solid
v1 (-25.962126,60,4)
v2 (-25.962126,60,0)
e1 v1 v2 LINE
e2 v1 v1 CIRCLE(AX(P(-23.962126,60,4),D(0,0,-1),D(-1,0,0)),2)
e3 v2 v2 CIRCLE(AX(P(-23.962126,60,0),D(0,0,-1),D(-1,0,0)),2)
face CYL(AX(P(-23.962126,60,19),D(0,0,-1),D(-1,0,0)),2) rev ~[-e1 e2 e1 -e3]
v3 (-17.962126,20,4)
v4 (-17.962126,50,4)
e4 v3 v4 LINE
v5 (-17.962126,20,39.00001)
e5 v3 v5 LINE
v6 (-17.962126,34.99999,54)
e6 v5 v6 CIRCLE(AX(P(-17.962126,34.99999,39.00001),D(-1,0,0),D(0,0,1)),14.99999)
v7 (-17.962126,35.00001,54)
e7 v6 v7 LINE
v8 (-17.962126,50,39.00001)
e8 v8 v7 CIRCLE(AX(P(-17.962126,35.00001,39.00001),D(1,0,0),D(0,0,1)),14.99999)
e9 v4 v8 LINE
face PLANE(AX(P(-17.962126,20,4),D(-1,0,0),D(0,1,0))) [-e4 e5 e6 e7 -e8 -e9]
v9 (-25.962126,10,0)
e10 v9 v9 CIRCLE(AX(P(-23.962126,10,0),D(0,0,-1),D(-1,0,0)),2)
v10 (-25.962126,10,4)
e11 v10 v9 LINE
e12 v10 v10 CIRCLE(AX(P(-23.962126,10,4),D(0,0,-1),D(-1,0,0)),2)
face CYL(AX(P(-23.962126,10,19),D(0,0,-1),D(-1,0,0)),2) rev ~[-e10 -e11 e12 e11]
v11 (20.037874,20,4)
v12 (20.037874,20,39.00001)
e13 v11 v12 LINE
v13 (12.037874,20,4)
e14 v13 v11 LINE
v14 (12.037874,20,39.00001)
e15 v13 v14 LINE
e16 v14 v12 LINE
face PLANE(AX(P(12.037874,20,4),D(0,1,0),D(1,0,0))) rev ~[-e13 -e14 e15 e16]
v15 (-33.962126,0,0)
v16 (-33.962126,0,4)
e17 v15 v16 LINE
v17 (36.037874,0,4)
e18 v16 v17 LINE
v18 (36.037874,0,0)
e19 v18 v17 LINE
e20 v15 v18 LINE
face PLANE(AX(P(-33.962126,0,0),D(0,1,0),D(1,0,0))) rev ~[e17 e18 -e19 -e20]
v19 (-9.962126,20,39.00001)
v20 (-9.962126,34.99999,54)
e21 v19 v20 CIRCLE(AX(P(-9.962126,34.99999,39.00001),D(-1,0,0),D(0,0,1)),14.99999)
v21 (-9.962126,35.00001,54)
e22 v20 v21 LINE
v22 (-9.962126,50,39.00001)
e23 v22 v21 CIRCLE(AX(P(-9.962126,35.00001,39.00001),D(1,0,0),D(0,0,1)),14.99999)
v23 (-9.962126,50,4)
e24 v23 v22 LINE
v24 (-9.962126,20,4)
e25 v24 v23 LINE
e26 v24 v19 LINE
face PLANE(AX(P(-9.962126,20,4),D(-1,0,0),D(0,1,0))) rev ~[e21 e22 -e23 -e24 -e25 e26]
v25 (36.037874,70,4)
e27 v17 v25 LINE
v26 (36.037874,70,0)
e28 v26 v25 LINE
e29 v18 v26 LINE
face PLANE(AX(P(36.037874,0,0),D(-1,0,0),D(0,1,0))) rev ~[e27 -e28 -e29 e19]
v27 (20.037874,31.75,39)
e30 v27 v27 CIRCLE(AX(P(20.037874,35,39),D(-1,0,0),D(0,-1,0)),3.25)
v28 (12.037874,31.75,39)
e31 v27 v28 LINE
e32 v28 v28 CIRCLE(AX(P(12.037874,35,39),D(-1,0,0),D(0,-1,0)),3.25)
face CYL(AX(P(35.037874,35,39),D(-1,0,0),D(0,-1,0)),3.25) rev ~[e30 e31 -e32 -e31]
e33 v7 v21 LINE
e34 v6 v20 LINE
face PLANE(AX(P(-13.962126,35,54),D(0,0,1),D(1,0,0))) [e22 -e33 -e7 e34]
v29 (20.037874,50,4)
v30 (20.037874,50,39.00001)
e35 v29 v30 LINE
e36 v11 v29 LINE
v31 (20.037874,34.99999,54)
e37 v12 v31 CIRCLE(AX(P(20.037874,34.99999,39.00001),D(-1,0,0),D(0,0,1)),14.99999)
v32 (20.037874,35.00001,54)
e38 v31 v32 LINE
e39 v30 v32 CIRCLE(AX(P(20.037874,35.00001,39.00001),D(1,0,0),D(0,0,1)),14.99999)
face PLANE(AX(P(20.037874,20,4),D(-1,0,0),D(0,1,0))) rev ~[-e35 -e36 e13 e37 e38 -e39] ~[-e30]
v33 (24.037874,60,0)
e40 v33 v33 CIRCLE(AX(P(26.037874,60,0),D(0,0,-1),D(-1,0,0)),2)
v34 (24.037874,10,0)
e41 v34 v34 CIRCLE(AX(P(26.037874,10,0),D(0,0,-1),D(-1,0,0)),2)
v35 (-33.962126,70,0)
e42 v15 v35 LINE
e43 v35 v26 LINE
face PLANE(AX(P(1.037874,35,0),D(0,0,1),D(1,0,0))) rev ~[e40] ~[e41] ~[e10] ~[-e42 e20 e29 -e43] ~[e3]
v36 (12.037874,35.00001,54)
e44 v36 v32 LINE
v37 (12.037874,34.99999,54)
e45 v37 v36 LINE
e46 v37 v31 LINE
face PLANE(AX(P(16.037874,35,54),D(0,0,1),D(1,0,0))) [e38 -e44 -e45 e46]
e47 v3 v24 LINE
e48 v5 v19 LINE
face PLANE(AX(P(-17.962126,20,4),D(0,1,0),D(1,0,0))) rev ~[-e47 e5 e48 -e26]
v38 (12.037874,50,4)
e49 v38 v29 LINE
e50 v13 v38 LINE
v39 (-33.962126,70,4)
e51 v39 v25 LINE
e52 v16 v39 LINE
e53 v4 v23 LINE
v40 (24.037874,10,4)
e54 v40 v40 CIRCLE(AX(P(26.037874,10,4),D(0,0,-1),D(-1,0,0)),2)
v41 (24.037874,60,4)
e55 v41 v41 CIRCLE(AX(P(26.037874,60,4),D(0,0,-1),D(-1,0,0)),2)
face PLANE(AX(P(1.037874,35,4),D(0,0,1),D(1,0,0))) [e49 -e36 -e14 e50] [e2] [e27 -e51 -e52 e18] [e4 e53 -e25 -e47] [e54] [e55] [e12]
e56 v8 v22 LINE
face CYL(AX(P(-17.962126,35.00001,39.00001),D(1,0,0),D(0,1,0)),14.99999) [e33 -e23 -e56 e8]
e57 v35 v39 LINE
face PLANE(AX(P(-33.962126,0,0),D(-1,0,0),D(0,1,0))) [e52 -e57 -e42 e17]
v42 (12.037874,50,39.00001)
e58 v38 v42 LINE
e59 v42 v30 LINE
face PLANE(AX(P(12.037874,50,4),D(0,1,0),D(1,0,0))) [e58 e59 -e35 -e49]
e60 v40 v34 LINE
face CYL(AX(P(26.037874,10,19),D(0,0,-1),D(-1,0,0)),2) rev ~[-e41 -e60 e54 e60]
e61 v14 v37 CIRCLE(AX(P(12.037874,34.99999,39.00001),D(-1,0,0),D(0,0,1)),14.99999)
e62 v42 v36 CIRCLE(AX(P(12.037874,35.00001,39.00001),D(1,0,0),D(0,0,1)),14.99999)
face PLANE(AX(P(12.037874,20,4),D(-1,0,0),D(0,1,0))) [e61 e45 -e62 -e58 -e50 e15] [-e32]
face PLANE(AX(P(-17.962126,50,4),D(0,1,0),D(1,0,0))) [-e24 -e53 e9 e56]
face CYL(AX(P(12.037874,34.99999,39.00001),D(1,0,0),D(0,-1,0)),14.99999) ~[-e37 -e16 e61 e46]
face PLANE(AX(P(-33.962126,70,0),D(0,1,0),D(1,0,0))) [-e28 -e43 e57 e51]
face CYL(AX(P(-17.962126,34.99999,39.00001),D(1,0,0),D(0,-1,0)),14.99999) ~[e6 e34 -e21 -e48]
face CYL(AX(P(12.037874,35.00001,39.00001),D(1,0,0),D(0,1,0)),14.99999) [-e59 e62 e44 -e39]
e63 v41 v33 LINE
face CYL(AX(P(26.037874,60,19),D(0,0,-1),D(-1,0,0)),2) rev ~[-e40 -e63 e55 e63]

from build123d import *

# Parameters (mm, degrees)
F0_W     = 70
F0_H     = 70
F1_DEPTH = 4
F2_W     = 8
F2_H     = 30
F3_DEPTH = 50
F4_R     = 14.99999
F7_D     = 6.5
F7_DEPTH = 15
F7_TIP   = 1.9527970118
F8_D     = 4
F8_DEPTH = 15
F8_TIP   = 1.2017212381


# Not quite as in the source:
# - a fillet or chamfer is up to 0.001 mm smaller than in the source, because OpenCascade refuses the exact size


with BuildPart() as f1:
    # F0 (on Top) → F1 (new body)
    with BuildSketch(Plane.XY):
        with Locations((1.0378739359, 35)):
            Rectangle(F0_W, F0_H)
    extrude(amount=F1_DEPTH)

    # F2 (on face) → F3 (join)
    with BuildSketch(Plane.XY.offset(4)):
        with Locations((-13.9621260641, 35)):
            Rectangle(F2_W, F2_H)
        with Locations((16.0378739359, 35)):
            Rectangle(F2_W, F2_H)
    extrude(amount=F3_DEPTH)

    # F4 (radius 15 in the source; OpenCascade refuses exactly that, so slightly less here)
    f4_edges = [f1.edges().sort_by_distance(p)[0] for p in [
        (-13.962126, 20, 54),
        (-13.962126, 50, 54),
        (16.037874, 20, 54),
        (16.037874, 50, 54),
    ]]
    fillet(f4_edges, radius=F4_R)

    # F7
    with Locations(Plane.YZ.offset(20.0378739359)):
        with Locations((35, 39)):
            Hole(F7_D / 2, depth=F7_DEPTH)
            with Locations((0, 0, -(F7_DEPTH + F7_TIP / 2))):  # 118° drill point
                Cone(0, F7_D / 2, F7_TIP, mode=Mode.SUBTRACT)

    # F8
    with Locations(Plane.XY.offset(4)):
        with Locations((-23.9621260641, 10), (26.0378739359, 10), (26.0378739359, 60), (-23.9621260641, 60)):
            Hole(F8_D / 2, depth=F8_DEPTH)
            with Locations((0, 0, -(F8_DEPTH + F8_TIP / 2))):  # 118° drill point
                Cone(0, F8_D / 2, F8_TIP, mode=Mode.SUBTRACT)


solid = f1.part
